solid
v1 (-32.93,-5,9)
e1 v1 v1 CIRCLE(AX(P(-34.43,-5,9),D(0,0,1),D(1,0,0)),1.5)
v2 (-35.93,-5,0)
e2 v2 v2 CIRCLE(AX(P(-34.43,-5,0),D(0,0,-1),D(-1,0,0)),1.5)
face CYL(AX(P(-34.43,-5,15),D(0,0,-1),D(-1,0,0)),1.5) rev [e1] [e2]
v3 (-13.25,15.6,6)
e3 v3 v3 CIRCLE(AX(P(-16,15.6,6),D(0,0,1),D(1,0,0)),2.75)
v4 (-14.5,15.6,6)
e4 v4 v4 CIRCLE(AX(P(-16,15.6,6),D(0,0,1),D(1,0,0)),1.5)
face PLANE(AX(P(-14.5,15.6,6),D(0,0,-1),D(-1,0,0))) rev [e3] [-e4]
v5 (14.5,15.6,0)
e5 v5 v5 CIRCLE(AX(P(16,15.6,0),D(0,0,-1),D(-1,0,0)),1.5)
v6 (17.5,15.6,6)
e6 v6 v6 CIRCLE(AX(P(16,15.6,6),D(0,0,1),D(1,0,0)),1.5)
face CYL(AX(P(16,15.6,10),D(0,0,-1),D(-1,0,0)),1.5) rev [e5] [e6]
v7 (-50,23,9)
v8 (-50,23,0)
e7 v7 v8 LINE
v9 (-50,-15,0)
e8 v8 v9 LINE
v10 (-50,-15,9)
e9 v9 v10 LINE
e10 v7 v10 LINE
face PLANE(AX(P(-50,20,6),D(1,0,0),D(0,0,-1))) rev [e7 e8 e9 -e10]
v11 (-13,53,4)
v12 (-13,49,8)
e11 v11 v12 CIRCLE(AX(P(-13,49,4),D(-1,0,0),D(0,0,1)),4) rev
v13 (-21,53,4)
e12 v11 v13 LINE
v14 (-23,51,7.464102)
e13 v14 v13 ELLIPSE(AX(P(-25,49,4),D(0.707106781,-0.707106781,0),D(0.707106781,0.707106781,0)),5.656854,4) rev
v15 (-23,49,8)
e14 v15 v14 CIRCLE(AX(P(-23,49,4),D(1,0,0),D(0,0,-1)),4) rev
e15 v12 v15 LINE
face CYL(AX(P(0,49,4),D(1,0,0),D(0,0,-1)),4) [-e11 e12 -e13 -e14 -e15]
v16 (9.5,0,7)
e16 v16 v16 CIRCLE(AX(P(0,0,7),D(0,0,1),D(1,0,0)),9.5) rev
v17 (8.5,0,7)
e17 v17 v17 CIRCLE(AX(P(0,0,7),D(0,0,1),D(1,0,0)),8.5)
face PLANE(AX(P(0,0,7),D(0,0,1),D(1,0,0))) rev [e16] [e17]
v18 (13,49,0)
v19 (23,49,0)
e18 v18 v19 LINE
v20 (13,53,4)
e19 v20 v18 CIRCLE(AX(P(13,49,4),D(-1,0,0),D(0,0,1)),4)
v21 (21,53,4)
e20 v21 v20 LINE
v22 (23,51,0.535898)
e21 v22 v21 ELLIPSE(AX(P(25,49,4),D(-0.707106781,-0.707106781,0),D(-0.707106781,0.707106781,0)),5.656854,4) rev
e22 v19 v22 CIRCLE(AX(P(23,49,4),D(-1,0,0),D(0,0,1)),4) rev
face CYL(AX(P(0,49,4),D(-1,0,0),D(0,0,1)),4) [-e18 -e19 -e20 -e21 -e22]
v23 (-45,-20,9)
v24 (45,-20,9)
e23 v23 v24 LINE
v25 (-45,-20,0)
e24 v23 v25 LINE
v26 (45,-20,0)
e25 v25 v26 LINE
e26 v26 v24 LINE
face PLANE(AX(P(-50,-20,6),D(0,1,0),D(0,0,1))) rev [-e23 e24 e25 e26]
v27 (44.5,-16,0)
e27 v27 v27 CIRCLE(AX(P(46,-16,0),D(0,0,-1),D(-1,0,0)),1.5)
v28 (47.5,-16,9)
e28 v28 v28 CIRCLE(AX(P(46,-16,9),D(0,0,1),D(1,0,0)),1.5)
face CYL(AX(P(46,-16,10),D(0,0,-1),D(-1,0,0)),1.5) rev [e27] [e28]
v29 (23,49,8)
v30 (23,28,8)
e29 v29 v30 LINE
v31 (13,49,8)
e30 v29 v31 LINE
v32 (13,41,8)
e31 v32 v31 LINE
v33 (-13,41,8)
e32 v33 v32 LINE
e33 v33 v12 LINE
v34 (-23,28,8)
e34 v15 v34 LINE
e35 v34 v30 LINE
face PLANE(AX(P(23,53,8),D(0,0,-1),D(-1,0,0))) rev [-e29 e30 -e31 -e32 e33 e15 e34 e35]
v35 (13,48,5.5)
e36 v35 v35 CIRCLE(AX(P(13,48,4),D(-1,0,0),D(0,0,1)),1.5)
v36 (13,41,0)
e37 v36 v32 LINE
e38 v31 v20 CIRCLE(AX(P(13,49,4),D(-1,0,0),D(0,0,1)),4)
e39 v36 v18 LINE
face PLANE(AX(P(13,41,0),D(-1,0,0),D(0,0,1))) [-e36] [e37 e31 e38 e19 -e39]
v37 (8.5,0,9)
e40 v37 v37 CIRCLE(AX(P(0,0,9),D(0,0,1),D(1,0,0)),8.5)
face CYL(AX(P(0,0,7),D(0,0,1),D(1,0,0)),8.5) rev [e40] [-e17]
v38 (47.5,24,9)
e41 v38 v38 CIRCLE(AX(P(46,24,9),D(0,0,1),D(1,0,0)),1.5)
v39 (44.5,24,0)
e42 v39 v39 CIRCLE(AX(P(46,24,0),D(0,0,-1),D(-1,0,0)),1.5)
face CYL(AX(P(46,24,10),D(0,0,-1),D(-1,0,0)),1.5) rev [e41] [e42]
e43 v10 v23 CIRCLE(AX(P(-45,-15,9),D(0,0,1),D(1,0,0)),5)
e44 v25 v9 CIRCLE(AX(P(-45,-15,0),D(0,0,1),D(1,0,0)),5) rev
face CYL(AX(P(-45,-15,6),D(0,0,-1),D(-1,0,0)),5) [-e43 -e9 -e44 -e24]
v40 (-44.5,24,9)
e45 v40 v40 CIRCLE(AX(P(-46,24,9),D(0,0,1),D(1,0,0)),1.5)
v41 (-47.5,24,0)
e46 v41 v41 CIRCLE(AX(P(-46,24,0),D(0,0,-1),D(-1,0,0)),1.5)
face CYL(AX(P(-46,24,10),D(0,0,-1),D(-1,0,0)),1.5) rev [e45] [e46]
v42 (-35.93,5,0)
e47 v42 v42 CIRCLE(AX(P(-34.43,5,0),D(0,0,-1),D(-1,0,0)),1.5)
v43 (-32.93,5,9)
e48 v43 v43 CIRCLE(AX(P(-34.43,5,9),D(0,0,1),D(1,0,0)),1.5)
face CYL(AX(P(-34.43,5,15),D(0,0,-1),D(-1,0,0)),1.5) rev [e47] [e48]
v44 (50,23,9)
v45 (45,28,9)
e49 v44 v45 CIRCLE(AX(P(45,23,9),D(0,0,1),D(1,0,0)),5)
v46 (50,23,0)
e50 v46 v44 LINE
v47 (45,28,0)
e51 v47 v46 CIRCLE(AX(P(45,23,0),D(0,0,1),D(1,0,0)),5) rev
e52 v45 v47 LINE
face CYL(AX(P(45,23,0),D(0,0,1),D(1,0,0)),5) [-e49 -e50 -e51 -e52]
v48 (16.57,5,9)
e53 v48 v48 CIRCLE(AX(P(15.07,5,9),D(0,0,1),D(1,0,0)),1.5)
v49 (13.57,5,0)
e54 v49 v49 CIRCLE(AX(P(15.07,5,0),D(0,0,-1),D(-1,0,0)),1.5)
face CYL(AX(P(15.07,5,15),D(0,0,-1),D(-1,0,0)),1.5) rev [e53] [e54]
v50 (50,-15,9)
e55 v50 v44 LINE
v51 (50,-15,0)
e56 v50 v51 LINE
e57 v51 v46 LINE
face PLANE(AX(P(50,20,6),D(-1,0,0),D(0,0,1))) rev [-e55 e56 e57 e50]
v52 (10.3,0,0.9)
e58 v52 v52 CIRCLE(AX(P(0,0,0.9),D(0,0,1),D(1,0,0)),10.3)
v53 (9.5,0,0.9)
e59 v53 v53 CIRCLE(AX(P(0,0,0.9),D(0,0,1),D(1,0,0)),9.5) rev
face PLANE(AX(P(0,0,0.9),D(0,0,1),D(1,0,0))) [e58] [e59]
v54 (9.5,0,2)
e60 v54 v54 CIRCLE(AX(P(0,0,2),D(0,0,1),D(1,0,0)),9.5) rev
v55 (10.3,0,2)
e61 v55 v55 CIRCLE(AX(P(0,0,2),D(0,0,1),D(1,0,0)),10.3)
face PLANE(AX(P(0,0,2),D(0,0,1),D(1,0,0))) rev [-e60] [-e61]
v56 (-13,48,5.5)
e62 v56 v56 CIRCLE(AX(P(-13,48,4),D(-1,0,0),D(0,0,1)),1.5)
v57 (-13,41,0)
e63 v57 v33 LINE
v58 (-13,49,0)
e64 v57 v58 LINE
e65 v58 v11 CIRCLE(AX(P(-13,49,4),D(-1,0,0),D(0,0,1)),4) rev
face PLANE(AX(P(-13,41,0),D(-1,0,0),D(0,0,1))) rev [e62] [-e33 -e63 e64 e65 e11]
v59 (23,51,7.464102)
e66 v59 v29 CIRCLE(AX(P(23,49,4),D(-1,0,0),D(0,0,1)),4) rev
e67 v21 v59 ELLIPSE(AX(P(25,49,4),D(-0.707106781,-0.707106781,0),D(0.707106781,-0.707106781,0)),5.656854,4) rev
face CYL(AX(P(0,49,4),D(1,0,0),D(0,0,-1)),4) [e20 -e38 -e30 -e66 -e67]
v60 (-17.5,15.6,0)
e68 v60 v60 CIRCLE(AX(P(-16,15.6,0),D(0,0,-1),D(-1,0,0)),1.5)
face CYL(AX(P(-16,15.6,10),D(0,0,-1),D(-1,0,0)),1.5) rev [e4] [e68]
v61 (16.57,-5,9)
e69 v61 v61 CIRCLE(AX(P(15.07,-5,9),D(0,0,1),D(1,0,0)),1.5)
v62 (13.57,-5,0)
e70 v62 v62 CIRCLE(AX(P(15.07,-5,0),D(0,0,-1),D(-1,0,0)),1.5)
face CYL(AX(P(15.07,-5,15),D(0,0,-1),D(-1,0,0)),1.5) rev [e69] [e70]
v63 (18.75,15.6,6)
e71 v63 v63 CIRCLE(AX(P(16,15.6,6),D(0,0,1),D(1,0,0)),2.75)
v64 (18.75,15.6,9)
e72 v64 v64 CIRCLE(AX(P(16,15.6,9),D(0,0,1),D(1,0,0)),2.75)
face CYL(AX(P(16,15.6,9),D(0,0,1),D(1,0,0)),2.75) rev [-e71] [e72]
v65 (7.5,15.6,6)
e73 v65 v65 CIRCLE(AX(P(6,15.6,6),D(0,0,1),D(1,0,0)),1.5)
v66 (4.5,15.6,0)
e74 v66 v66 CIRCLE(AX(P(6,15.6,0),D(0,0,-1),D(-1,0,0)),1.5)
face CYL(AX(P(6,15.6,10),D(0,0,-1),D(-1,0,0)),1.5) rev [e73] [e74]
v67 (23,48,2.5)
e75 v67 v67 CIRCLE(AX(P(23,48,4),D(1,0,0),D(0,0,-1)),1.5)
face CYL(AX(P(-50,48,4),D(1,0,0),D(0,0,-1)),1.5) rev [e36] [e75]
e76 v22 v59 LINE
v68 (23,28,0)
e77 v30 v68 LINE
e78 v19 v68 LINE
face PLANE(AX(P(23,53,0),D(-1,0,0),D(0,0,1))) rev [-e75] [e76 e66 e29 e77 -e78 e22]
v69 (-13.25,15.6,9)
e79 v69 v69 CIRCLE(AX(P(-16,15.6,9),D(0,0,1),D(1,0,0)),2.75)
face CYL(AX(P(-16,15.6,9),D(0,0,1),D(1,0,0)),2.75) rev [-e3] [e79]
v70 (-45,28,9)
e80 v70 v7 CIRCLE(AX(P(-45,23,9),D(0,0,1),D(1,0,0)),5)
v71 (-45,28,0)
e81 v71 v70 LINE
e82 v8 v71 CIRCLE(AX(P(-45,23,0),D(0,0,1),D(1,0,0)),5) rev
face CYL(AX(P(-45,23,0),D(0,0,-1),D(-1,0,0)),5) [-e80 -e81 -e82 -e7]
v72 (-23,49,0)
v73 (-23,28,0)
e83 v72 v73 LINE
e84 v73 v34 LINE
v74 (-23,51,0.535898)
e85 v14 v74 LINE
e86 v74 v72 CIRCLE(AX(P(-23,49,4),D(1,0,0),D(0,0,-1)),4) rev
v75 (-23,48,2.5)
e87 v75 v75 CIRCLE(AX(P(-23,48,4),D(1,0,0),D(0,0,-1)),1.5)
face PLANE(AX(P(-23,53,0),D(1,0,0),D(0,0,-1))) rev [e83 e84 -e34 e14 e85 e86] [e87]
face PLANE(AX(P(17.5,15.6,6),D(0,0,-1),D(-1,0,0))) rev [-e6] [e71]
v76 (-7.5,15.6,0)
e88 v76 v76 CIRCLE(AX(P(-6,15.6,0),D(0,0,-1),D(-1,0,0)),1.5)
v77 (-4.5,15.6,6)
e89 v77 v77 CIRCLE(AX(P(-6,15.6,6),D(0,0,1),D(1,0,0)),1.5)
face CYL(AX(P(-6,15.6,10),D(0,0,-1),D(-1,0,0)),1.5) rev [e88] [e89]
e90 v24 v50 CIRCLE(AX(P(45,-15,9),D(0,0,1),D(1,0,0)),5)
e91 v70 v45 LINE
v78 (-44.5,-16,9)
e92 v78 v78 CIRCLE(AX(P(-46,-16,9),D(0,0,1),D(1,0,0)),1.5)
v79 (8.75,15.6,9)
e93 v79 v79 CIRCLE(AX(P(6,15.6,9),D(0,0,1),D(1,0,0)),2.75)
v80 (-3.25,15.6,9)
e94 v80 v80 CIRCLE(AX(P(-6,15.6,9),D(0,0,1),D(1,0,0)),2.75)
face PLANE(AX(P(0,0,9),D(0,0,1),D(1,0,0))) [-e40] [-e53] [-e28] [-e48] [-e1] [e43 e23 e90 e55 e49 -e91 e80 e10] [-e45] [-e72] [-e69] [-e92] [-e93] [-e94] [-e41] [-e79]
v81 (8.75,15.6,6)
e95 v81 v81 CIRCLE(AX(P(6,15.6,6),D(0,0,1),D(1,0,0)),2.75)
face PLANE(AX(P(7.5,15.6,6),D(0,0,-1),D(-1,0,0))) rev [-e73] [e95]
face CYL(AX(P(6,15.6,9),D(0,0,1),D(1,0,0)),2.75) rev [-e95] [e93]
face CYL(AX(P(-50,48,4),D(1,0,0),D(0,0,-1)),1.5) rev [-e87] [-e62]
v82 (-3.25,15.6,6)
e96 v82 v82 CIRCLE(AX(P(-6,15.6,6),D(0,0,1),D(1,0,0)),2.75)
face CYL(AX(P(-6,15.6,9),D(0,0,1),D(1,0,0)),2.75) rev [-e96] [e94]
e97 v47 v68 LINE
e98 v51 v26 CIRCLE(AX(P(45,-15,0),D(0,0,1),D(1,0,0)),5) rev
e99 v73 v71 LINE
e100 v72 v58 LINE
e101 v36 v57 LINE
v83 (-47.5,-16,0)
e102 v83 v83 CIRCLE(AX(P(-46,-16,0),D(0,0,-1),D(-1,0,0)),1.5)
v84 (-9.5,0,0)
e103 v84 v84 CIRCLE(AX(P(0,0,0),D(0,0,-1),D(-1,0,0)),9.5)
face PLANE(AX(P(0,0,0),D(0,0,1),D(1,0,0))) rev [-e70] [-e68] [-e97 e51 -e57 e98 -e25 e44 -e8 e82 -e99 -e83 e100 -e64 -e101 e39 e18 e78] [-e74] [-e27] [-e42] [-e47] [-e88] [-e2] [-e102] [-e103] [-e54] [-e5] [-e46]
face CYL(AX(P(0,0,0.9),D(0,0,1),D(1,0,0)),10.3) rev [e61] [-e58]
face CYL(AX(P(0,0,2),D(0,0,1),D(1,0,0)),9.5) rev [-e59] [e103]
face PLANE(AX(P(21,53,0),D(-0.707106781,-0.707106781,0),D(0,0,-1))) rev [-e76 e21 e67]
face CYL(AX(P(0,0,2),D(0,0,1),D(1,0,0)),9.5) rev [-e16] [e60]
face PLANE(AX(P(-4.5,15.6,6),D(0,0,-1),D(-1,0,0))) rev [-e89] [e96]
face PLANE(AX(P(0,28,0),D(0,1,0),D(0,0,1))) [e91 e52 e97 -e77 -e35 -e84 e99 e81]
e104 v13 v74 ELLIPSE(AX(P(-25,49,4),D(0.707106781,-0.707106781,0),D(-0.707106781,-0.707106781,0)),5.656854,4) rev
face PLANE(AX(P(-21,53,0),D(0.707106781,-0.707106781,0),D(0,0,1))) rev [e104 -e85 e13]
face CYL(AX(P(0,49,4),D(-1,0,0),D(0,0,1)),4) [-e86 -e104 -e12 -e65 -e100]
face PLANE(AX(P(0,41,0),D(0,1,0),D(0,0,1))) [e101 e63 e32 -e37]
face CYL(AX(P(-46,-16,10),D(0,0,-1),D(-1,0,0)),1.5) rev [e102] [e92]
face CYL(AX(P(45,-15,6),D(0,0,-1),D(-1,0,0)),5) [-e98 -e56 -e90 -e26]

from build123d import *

# Parameters (mm, degrees)
SKETCH_2_W                = 100
SKETCH_2_H                = 40
EXTRUDE_1_DEPTH           = 6
SKETCH_5_W                = 100
SKETCH_5_H                = 40
EXTRUDE_2_DEPTH           = 3
SKETCH_6_R                = 9.5
CUT_EXTRUDE_1_DEPTH       = 7
CUT_EXTRUDE_START         = -8
SKETCH_7_R                = 9.5
CUT_EXTRUDE_2_DEPTH       = 8
SKETCH_8_R                = 10.3
CUT_EXTRUDE_3_DEPTH       = 1.1
SKETCH_9_R                = 1.5
CUT_EXTRUDE_4_DEPTH       = 15
SKETCH_11_W               = 100
SKETCH_11_H               = 9
EXTRUDE_5_DEPTH           = 8
FILLET_3_R                = 5
SKETCH_16_R               = 1.5
CUT_EXTRUDE_6_DEPTH       = 10
HOLE_WIZARD_5_D           = 3
HOLE_WIZARD_5_CBORE_D     = 5.5
HOLE_WIZARD_5_CBORE_DEPTH = 3
SKETCH_20_R               = 1.5
CUT_EXTRUDE_7_DEPTH       = 10
SKETCH_22_R               = 9.5
SKETCH_22_R_2             = 8.5
EXTRUDE_6_DEPTH           = 2
SKETCH_23_W               = 46
SKETCH_23_H               = 8
EXTRUDE_7_DEPTH           = 25
SKETCH_24_W               = 13
SKETCH_24_H               = 8
CUT_EXTRUDE_8_DEPTH       = 12
CHAMFER_1_SIZE            = 2
FILLET_4_R                = 4
SKETCH_25_R               = 1.5
CUT_EXTRUDE_9_DEPTH       = 91.65870063


with BuildPart() as part:
    # 草图2 → 凸台-拉伸1 (new body)
    with BuildSketch(Plane.XY):
        Rectangle(SKETCH_2_W, SKETCH_2_H)
    extrude(amount=EXTRUDE_1_DEPTH)

    # 草图5 → 凸台-拉伸2 (add)
    with BuildSketch(Plane.XY.offset(6)):
        Rectangle(SKETCH_5_W, SKETCH_5_H)
    extrude(amount=EXTRUDE_2_DEPTH)

    # 草图6 → 切除-拉伸1 (cut)
    with BuildSketch(Plane.XY.offset(9)):
        Circle(SKETCH_6_R)
    extrude(amount=-CUT_EXTRUDE_1_DEPTH, mode=Mode.SUBTRACT)

    # 草图7 → 切除-拉伸2 (cut)
    with BuildSketch(Plane(origin=(0, 0, 0), x_dir=(-1, 0, 0), z_dir=(0, 0, -1)).offset(CUT_EXTRUDE_START)):
        with Locations(Location((0, 0, 0), (0, 0, 180))):
            Circle(SKETCH_7_R)
    extrude(amount=CUT_EXTRUDE_2_DEPTH, mode=Mode.SUBTRACT)

    # 草图8 → 切除-拉伸3 (cut)
    with BuildSketch(Plane.XY.offset(2)):
        Circle(SKETCH_8_R)
    extrude(amount=-CUT_EXTRUDE_3_DEPTH, mode=Mode.SUBTRACT)

    # 草图9 → 切除-拉伸4 (cut)
    with BuildSketch(Plane(origin=(0, 0, 0), x_dir=(-1, 0, 0), z_dir=(0, 0, -1))):
        with Locations((-15.07, 5)):
            Circle(SKETCH_9_R)
        with Locations((34.43, 5)):
            Circle(SKETCH_9_R)
        with Locations((-15.07, -5)):
            Circle(SKETCH_9_R)
        with Locations((34.43, -5)):
            Circle(SKETCH_9_R)
    extrude(amount=-CUT_EXTRUDE_4_DEPTH, mode=Mode.SUBTRACT)

    # 草图11 → 凸台-拉伸5 (add)
    with BuildSketch(Plane(origin=(0, 20, 0), x_dir=(1, 0, 0), z_dir=(0, 1, 0))):
        with Locations((0, -4.5)):
            Rectangle(SKETCH_11_W, SKETCH_11_H)
    extrude(amount=EXTRUDE_5_DEPTH)

    # 圆角3
    fillet_3_edges = [part.edges().sort_by_distance(p)[0] for p in [
        (-50, 28, 4.5),
        (50, 28, 4.5),
        (50, -20, 4.5),
        (-50, -20, 4.5),
    ]]
    fillet(fillet_3_edges, radius=FILLET_3_R)

    # 草图16 → 切除-拉伸6 (cut)
    with BuildSketch(Plane(origin=(0, 0, 0), x_dir=(-1, 0, 0), z_dir=(0, 0, -1))):
        with Locations((-6, 15.6)):
            Circle(SKETCH_16_R)
        with Locations((6, 15.6)):
            Circle(SKETCH_16_R)
        with Locations((-16, 15.6)):
            Circle(SKETCH_16_R)
        with Locations((16, 15.6)):
            Circle(SKETCH_16_R)
    extrude(amount=-CUT_EXTRUDE_6_DEPTH, mode=Mode.SUBTRACT)

    # 孔5 (through all)
    with Locations(Plane(origin=(-16, 15.6, 9), x_dir=(1, 0, 0), z_dir=(0, 0, 1))):
        with Locations((0, 0), (10, 0), (22, 0), (32, 0)):
            CounterBoreHole(HOLE_WIZARD_5_D / 2, HOLE_WIZARD_5_CBORE_D / 2, HOLE_WIZARD_5_CBORE_DEPTH)

    # 草图20 → 切除-拉伸7 (cut)
    with BuildSketch(Plane(origin=(0, 0, 0), x_dir=(-1, 0, 0), z_dir=(0, 0, -1))):
        with Locations((-46, 24)):
            Circle(SKETCH_20_R)
        with Locations((46, 24)):
            Circle(SKETCH_20_R)
        with Locations((-46, -16)):
            Circle(SKETCH_20_R)
        with Locations((46, -16)):
            Circle(SKETCH_20_R)
    extrude(amount=-CUT_EXTRUDE_7_DEPTH, mode=Mode.SUBTRACT)

    # 草图22 → 凸台-拉伸6 (add)
    with BuildSketch(Plane.XY.offset(9)):
        Circle(SKETCH_22_R)
        Circle(SKETCH_22_R_2, mode=Mode.SUBTRACT)
    extrude(amount=-EXTRUDE_6_DEPTH)

    # 草图23 → 凸台-拉伸7 (add)
    with BuildSketch(Plane(origin=(0, 28, 0), x_dir=(1, 0, 0), z_dir=(0, 1, 0))):
        with Locations((0, -4)):
            Rectangle(SKETCH_23_W, SKETCH_23_H)
    extrude(amount=EXTRUDE_7_DEPTH)

    # 草图24 → 切除-拉伸8 (cut)
    with BuildSketch(Plane(origin=(0, 53, 0), x_dir=(1, 0, 0), z_dir=(0, 1, 0))):
        with Locations((-6.5, -4)):
            Rectangle(SKETCH_24_W, SKETCH_24_H)
        with Locations((6.5, -4)):
            Rectangle(SKETCH_24_W, SKETCH_24_H)
    extrude(amount=-CUT_EXTRUDE_8_DEPTH, mode=Mode.SUBTRACT)

    # 倒角1
    chamfer_1_edges = [part.edges().sort_by_distance(p)[0] for p in [
        (-23, 53, 4),
        (23, 53, 4),
    ]]
    chamfer(chamfer_1_edges, length=CHAMFER_1_SIZE)

    # 圆角4
    fillet_4_edges = [part.edges().sort_by_distance(p)[0] for p in [
        (17, 53, 8),
        (17, 53, 0),
        (-17, 53, 8),
        (-17, 53, 0),
    ]]
    fillet(fillet_4_edges, radius=FILLET_4_R - 0.0001)  # a hair under: the kernel refuses the full size

    # 草图25 → 切除-拉伸9 (cut, through all)
    with BuildSketch(Plane(origin=(23, 0, 0), x_dir=(0, 0, -1), z_dir=(1, 0, 0))):
        with Locations((-4, 48)):
            Circle(SKETCH_25_R)
    extrude(amount=-CUT_EXTRUDE_9_DEPTH, mode=Mode.SUBTRACT)


solid = part.part
